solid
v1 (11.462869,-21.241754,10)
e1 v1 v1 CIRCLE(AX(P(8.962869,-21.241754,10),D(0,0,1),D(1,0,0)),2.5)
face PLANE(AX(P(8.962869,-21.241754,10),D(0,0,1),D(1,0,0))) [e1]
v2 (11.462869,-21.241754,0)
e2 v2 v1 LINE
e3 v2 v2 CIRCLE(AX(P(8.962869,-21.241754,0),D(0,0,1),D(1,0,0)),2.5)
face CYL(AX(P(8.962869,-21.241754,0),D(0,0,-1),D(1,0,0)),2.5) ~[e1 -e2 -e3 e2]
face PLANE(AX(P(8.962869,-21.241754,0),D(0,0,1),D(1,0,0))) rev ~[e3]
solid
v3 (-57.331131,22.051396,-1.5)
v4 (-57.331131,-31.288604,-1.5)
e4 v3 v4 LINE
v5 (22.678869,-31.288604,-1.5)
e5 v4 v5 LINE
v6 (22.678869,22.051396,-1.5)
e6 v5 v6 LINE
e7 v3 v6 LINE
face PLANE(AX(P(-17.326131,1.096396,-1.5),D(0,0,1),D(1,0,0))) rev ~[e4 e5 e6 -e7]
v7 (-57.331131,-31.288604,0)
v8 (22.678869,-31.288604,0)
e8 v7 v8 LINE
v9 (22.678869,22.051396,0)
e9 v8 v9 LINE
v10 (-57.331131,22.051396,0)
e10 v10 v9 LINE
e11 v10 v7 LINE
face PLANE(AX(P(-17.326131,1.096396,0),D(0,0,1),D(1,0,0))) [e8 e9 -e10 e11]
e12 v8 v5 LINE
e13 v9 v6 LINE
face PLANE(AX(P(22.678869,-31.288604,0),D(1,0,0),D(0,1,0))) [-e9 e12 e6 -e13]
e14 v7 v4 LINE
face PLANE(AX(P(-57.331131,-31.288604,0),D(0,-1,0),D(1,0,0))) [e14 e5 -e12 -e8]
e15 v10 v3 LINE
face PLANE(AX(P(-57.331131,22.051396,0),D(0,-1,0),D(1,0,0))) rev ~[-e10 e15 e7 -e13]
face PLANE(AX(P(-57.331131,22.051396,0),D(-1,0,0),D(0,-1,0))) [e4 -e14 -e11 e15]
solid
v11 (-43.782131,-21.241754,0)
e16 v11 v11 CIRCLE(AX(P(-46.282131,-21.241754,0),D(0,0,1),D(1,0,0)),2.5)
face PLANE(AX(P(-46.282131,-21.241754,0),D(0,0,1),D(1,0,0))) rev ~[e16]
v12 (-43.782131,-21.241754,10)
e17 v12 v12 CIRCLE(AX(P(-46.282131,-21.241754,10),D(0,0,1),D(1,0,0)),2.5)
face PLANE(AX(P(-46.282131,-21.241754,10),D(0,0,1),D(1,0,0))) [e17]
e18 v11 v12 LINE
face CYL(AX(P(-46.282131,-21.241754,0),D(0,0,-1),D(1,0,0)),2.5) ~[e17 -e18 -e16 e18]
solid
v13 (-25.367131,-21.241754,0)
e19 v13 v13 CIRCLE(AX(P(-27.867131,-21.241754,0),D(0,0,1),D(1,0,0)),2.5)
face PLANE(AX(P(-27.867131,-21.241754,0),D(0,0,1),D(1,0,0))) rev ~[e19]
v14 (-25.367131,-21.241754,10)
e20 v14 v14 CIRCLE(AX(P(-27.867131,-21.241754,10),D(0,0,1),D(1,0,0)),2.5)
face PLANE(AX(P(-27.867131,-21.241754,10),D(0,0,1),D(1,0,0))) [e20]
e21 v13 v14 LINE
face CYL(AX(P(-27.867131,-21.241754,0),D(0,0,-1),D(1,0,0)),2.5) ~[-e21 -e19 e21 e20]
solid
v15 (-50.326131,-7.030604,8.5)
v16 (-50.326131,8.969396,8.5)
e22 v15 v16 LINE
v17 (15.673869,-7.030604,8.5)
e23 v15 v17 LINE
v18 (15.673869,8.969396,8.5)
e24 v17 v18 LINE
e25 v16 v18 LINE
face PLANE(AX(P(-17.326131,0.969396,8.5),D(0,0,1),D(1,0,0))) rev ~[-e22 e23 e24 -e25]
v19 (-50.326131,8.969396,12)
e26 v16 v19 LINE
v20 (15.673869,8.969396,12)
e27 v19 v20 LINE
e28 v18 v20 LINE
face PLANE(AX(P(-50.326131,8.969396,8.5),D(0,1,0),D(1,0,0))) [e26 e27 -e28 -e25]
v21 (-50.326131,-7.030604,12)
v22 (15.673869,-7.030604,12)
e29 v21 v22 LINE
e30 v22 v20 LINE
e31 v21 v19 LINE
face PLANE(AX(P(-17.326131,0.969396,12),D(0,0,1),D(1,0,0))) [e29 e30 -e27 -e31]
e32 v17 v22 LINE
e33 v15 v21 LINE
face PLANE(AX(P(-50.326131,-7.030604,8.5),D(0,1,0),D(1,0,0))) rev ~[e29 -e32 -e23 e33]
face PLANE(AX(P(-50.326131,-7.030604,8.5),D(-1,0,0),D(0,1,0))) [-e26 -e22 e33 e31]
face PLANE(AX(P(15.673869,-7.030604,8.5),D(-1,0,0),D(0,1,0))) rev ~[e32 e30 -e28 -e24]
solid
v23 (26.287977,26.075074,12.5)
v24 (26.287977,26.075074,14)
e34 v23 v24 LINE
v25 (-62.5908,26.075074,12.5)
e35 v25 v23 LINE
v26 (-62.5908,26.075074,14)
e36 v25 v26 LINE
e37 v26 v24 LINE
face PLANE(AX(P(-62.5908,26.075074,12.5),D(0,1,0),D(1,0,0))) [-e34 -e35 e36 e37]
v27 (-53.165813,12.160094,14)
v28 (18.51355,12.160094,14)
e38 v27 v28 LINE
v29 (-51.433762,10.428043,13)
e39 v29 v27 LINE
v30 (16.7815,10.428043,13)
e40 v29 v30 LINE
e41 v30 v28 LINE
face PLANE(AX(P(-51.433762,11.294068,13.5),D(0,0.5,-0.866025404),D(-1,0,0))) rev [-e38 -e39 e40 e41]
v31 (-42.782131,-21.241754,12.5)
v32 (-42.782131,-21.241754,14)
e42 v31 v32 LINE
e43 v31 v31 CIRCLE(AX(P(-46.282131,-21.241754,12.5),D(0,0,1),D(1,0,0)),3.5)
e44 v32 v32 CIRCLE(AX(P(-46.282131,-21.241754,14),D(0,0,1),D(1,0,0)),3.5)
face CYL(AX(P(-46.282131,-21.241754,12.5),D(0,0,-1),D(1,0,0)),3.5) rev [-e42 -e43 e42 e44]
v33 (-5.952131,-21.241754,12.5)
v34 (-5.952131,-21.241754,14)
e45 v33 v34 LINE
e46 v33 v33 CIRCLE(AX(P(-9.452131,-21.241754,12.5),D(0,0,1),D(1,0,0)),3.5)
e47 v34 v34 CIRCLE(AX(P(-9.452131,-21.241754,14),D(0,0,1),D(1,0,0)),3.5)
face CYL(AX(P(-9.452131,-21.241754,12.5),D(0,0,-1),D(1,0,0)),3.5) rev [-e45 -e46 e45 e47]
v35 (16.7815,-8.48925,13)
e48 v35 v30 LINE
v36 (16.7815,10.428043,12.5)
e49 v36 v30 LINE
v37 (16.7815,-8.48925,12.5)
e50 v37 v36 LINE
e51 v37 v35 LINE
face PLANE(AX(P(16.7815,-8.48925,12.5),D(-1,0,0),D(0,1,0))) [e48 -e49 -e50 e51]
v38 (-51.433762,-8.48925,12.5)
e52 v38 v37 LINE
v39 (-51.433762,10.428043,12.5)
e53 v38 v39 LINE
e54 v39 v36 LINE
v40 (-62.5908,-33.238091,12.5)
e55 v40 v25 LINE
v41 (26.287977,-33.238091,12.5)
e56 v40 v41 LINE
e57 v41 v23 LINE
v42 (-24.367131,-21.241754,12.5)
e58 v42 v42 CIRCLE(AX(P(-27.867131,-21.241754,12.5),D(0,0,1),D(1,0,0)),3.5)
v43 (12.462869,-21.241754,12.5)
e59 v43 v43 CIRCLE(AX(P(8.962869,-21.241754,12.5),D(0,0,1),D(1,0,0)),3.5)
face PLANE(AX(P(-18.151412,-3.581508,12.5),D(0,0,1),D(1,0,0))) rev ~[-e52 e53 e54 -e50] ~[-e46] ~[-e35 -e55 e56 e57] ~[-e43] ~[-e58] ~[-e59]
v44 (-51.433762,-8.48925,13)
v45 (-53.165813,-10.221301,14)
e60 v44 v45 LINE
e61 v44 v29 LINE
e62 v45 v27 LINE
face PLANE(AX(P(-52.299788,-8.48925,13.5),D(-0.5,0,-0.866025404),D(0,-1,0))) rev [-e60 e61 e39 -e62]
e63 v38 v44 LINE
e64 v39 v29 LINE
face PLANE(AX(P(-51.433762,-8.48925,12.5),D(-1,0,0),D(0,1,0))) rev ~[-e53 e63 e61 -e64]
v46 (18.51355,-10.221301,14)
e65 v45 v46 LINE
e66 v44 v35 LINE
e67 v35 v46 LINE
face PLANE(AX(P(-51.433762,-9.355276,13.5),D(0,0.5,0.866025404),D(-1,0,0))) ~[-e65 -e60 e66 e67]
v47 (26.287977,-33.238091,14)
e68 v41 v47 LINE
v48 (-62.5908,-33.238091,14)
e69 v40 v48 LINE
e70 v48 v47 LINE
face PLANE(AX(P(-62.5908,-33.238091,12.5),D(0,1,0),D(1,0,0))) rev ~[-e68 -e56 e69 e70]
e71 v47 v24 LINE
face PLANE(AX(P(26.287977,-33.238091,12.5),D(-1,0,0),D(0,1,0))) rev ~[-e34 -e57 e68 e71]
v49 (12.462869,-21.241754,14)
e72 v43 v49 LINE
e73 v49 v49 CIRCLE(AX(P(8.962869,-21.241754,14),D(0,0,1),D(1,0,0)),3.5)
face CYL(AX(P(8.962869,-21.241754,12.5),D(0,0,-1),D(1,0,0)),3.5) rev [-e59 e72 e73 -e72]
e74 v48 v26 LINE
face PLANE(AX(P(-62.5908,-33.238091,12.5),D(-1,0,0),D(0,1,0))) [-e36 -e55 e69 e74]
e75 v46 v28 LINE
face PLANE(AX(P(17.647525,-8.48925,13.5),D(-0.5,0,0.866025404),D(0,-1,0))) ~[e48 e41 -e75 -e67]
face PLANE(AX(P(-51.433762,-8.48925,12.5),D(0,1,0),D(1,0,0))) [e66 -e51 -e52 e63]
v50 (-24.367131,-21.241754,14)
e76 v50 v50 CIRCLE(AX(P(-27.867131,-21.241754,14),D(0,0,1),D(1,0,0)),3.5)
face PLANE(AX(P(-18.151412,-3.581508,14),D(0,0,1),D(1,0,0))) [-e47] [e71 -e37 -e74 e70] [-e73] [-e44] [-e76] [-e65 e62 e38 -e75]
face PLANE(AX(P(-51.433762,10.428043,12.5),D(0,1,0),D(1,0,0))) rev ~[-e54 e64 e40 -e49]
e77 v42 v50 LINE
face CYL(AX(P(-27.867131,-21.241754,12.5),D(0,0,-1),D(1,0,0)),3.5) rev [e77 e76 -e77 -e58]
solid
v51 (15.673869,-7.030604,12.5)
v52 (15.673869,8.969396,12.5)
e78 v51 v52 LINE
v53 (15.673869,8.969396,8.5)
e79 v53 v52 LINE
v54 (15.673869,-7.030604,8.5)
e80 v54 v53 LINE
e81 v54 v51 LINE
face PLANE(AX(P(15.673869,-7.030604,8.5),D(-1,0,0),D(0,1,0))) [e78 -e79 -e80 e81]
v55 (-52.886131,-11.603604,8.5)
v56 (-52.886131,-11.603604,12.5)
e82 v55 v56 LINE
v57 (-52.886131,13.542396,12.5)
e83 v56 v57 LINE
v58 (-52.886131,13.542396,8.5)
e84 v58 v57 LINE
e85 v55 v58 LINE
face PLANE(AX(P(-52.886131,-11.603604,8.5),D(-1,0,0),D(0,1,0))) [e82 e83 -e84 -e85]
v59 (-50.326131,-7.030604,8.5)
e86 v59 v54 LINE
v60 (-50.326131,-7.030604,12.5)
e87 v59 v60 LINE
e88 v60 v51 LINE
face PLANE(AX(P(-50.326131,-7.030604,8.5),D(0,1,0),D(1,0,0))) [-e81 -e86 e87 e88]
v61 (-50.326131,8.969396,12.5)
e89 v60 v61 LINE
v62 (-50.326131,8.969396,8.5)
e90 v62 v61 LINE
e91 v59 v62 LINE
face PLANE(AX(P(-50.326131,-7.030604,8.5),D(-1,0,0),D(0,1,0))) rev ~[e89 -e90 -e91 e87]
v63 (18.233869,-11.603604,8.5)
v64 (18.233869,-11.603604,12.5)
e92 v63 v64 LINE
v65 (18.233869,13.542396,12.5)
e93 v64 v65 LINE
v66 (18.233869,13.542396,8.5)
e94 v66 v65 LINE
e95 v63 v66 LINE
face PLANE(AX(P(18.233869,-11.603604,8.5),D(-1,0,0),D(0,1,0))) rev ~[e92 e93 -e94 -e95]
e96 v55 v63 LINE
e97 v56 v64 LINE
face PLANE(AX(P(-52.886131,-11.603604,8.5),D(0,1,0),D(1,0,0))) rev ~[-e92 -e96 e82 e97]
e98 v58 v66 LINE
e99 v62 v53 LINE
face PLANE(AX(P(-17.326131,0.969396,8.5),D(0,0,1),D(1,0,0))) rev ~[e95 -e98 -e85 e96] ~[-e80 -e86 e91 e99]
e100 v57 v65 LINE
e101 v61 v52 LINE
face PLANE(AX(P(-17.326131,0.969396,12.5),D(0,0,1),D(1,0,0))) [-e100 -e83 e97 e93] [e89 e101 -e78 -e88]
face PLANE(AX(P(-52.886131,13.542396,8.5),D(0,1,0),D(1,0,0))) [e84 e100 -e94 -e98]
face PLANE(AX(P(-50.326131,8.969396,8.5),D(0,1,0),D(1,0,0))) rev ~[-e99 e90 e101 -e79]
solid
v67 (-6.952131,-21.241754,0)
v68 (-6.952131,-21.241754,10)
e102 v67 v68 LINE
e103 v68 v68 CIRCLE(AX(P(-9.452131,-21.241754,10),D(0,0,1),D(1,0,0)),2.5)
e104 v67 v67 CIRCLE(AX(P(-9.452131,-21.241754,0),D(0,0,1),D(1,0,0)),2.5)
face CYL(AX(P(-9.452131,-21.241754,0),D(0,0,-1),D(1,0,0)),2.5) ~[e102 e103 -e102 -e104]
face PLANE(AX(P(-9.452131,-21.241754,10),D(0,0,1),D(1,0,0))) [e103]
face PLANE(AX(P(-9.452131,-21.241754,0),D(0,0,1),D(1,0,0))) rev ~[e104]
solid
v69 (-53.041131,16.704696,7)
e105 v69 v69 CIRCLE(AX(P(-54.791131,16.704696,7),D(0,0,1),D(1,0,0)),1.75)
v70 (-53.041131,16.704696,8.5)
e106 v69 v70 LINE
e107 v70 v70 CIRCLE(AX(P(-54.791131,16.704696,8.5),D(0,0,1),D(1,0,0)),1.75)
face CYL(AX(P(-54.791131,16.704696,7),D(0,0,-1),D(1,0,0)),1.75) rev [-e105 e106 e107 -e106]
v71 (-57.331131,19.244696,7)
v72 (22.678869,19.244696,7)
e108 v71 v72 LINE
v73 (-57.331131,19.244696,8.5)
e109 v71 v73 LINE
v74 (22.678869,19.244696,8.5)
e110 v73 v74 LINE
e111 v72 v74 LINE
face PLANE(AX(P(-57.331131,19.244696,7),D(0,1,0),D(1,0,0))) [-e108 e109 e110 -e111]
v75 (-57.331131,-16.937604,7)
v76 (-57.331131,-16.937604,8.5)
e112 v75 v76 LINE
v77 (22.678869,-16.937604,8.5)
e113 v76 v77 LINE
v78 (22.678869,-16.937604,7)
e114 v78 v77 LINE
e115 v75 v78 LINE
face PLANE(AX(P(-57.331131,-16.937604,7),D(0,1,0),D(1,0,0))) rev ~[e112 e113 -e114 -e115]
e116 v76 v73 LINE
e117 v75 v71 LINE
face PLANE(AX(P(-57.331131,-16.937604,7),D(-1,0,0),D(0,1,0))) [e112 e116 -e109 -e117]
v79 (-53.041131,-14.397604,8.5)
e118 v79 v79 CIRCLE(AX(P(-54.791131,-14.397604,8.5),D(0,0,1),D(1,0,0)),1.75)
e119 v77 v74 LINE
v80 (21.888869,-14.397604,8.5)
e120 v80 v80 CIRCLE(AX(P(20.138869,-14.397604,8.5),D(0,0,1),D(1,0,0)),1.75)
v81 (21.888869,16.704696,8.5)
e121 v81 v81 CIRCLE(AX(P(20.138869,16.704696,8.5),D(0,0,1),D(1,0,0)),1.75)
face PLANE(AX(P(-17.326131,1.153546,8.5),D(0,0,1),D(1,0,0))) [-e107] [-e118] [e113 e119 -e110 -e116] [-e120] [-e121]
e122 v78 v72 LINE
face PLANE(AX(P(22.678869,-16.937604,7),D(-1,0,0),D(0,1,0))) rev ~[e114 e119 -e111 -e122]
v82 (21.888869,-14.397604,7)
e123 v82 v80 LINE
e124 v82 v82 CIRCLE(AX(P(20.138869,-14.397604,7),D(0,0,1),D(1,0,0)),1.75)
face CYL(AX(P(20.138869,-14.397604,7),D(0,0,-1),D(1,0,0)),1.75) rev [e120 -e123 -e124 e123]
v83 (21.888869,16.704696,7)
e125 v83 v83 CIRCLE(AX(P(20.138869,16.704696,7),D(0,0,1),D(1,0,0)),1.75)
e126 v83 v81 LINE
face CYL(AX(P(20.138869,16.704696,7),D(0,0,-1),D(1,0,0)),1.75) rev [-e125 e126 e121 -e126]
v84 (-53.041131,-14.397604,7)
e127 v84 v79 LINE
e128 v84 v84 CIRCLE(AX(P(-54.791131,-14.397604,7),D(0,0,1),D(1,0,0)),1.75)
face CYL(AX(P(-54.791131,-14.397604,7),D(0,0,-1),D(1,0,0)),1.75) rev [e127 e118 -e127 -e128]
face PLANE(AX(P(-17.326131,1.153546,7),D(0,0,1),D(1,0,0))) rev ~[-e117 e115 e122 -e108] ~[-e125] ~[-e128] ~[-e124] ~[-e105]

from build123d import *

# Parameters (mm, degrees)
F0_W      = 80.01
F0_H      = 36.068
F0_W_2    = 71.247
F0_H_2    = 25.019
F0_W_3    = 66.04
F0_H_3    = 16.002
F0_H_4    = 14.351
F0_R      = 2.5
F0_H_5    = 2.921
F1_DEPTH  = 1.5
F2_DEPTH  = 10
F4_W      = 80.01
F4_H      = 36.1823
F4_R      = 1.75
F5_DEPTH  = 1.5
F6_W      = 71.12
F6_H      = 25.146
F6_W_2    = 66
F6_H_2    = 16
F7_DEPTH  = 4
F8_DEPTH  = 3.5
F9_W      = 88.8787768781
F9_H      = 59.3131650239
F9_R      = 3.5
F9_W_2    = 71.12
F9_H_2    = 25.146
F9_W_3    = 68.2152619944
F9_H_3    = 18.9172932116
F10_DEPTH = 1.5
F11_SIZE2 = 1.7320508076
F11_SIZE  = 1


# Not quite as in the source:
# - a feature of the source that left no trace in its solid (it failed there, or was rolled back) is left out


with BuildPart() as f1:
    # F0 (on Top) → F1 (new body)
    with BuildSketch(Plane.XY):
        with Locations((-17.3261313879, 1.0963964765)):
            Rectangle(F0_W, F0_H)
        with Locations((-17.2626313879, 1.0328964765)):
            Rectangle(F0_W_2, F0_H_2, mode=Mode.SUBTRACT)
        with Locations((-17.2626313879, 1.0328964765)):
            Rectangle(F0_W_2, F0_H_2)
        with Locations((-17.1991313879, 1.0963964765)):
            Rectangle(F0_W_3, F0_H_3, mode=Mode.SUBTRACT)
        with Locations((-17.3261313879, -24.1131035235)):
            Rectangle(F0_W, F0_H_4)
        with Locations((-46.2821313879, -21.2417540622)):
            Circle(F0_R, mode=Mode.SUBTRACT)
        with Locations((-27.8671313879, -21.2417540622)):
            Circle(F0_R, mode=Mode.SUBTRACT)
        with Locations((-9.4521313879, -21.2417540622)):
            Circle(F0_R, mode=Mode.SUBTRACT)
        with Locations((8.9628686121, -21.2417540622)):
            Circle(F0_R, mode=Mode.SUBTRACT)
        with Locations((-17.1991313879, 1.0963964765)):
            Rectangle(F0_W_3, F0_H_3)
        with Locations((-17.3261313879, 20.5908964765)):
            Rectangle(F0_W, F0_H_5)
        with Locations((-9.4521313879, -21.2417540622)):
            Circle(F0_R)
        with Locations((-46.2821313879, -21.2417540622)):
            Circle(F0_R)
        with Locations((-27.8671313879, -21.2417540622)):
            Circle(F0_R)
        with Locations((8.9628686121, -21.2417540622)):
            Circle(F0_R)
    extrude(amount=-F1_DEPTH)


with BuildPart() as f2:
    # F0 (on Top) → F2 (new body)
    with BuildSketch(Plane.XY):
        with Locations((-46.2821313879, -21.2417540622)):
            Circle(F0_R)
    extrude(amount=F2_DEPTH)


with BuildPart() as f2b:
    # F0 (on Top) → F2, piece 2 (new body)
    with BuildSketch(Plane.XY):
        with Locations((-27.8671313879, -21.2417540622)):
            Circle(F0_R)
    extrude(amount=F2_DEPTH)


with BuildPart() as f2c:
    # F0 (on Top) → F2, piece 3 (new body)
    with BuildSketch(Plane.XY):
        with Locations((-9.4521313879, -21.2417540622)):
            Circle(F0_R)
    extrude(amount=F2_DEPTH)


with BuildPart() as f2d:
    # F0 (on Top) → F2, piece 4 (new body)
    with BuildSketch(Plane.XY):
        with Locations((8.9628686121, -21.2417540622)):
            Circle(F0_R)
    extrude(amount=F2_DEPTH)


with BuildPart() as f5:
    # F4 (on offset) → F5 (new body)
    with BuildSketch(Plane.XY.offset(7)):
        with Locations((-17.3261313879, 1.1535464765)):
            Rectangle(F4_W, F4_H)
        with Locations((-54.7911313879, -14.3976035235)):
            Circle(F4_R, mode=Mode.SUBTRACT)
        with Locations((20.1388686121, -14.3976035235)):
            Circle(F4_R, mode=Mode.SUBTRACT)
        with Locations((-54.7911313879, 16.7046964765)):
            Circle(F4_R, mode=Mode.SUBTRACT)
        with Locations((20.1388686121, 16.7046964765)):
            Circle(F4_R, mode=Mode.SUBTRACT)
    extrude(amount=F5_DEPTH)


with BuildPart() as f7:
    # F6 (on face) → F7 (new body)
    with BuildSketch(Plane.XY.offset(8.5)):
        with Locations((-17.3261313879, 0.9693964765)):
            Rectangle(F6_W, F6_H)
        with Locations((-17.3261313879, 0.9693964765)):
            Rectangle(F6_W_2, F6_H_2, mode=Mode.SUBTRACT)
    extrude(amount=F7_DEPTH)


with BuildPart() as f8:
    # F6 (on face) → F8 (new body)
    with BuildSketch(Plane.XY.offset(8.5)):
        with Locations((-17.3261313879, 0.9693964765)):
            Rectangle(F6_W_2, F6_H_2)
    extrude(amount=F8_DEPTH)


with BuildPart() as f10:
    # F9 (on face) → F10 (new body)
    with BuildSketch(Plane.XY.offset(12.5)):
        with Locations((-18.1514117867, -3.5815080628)):
            Rectangle(F9_W, F9_H)
        with Locations((-46.2821313879, -21.2417540622)):
            Circle(F9_R, mode=Mode.SUBTRACT)
        with Locations((-27.8671313879, -21.2417540622)):
            Circle(F9_R, mode=Mode.SUBTRACT)
        with Locations((-9.4521313879, -21.2417540622)):
            Circle(F9_R, mode=Mode.SUBTRACT)
        with Locations((8.9628686121, -21.2417540622)):
            Circle(F9_R, mode=Mode.SUBTRACT)
        with Locations((-17.3261313879, 0.9693964765)):
            Rectangle(F9_W_2, F9_H_2, mode=Mode.SUBTRACT)
        with Locations((-17.3261313879, 0.9693964765)):
            Rectangle(F9_W_2, F9_H_2)
        with Locations((-17.3261313879, 0.9693964765)):
            Rectangle(F9_W_3, F9_H_3, mode=Mode.SUBTRACT)
    extrude(amount=F10_DEPTH)

    # F11
    f11_edges = [f10.edges().sort_by_distance(p)[0] for p in [
        (-17.326131, 10.428043, 14),
        (-51.433762, 0.969396, 14),
        (-17.326131, -8.48925, 14),
        (16.7815, 0.969396, 14),
    ]]
    chamfer(f11_edges, length=F11_SIZE, length2=F11_SIZE2)


solid = Compound([f1.part, f2.part, f2b.part, f2c.part, f2d.part, f5.part, f7.part, f8.part, f10.part])
